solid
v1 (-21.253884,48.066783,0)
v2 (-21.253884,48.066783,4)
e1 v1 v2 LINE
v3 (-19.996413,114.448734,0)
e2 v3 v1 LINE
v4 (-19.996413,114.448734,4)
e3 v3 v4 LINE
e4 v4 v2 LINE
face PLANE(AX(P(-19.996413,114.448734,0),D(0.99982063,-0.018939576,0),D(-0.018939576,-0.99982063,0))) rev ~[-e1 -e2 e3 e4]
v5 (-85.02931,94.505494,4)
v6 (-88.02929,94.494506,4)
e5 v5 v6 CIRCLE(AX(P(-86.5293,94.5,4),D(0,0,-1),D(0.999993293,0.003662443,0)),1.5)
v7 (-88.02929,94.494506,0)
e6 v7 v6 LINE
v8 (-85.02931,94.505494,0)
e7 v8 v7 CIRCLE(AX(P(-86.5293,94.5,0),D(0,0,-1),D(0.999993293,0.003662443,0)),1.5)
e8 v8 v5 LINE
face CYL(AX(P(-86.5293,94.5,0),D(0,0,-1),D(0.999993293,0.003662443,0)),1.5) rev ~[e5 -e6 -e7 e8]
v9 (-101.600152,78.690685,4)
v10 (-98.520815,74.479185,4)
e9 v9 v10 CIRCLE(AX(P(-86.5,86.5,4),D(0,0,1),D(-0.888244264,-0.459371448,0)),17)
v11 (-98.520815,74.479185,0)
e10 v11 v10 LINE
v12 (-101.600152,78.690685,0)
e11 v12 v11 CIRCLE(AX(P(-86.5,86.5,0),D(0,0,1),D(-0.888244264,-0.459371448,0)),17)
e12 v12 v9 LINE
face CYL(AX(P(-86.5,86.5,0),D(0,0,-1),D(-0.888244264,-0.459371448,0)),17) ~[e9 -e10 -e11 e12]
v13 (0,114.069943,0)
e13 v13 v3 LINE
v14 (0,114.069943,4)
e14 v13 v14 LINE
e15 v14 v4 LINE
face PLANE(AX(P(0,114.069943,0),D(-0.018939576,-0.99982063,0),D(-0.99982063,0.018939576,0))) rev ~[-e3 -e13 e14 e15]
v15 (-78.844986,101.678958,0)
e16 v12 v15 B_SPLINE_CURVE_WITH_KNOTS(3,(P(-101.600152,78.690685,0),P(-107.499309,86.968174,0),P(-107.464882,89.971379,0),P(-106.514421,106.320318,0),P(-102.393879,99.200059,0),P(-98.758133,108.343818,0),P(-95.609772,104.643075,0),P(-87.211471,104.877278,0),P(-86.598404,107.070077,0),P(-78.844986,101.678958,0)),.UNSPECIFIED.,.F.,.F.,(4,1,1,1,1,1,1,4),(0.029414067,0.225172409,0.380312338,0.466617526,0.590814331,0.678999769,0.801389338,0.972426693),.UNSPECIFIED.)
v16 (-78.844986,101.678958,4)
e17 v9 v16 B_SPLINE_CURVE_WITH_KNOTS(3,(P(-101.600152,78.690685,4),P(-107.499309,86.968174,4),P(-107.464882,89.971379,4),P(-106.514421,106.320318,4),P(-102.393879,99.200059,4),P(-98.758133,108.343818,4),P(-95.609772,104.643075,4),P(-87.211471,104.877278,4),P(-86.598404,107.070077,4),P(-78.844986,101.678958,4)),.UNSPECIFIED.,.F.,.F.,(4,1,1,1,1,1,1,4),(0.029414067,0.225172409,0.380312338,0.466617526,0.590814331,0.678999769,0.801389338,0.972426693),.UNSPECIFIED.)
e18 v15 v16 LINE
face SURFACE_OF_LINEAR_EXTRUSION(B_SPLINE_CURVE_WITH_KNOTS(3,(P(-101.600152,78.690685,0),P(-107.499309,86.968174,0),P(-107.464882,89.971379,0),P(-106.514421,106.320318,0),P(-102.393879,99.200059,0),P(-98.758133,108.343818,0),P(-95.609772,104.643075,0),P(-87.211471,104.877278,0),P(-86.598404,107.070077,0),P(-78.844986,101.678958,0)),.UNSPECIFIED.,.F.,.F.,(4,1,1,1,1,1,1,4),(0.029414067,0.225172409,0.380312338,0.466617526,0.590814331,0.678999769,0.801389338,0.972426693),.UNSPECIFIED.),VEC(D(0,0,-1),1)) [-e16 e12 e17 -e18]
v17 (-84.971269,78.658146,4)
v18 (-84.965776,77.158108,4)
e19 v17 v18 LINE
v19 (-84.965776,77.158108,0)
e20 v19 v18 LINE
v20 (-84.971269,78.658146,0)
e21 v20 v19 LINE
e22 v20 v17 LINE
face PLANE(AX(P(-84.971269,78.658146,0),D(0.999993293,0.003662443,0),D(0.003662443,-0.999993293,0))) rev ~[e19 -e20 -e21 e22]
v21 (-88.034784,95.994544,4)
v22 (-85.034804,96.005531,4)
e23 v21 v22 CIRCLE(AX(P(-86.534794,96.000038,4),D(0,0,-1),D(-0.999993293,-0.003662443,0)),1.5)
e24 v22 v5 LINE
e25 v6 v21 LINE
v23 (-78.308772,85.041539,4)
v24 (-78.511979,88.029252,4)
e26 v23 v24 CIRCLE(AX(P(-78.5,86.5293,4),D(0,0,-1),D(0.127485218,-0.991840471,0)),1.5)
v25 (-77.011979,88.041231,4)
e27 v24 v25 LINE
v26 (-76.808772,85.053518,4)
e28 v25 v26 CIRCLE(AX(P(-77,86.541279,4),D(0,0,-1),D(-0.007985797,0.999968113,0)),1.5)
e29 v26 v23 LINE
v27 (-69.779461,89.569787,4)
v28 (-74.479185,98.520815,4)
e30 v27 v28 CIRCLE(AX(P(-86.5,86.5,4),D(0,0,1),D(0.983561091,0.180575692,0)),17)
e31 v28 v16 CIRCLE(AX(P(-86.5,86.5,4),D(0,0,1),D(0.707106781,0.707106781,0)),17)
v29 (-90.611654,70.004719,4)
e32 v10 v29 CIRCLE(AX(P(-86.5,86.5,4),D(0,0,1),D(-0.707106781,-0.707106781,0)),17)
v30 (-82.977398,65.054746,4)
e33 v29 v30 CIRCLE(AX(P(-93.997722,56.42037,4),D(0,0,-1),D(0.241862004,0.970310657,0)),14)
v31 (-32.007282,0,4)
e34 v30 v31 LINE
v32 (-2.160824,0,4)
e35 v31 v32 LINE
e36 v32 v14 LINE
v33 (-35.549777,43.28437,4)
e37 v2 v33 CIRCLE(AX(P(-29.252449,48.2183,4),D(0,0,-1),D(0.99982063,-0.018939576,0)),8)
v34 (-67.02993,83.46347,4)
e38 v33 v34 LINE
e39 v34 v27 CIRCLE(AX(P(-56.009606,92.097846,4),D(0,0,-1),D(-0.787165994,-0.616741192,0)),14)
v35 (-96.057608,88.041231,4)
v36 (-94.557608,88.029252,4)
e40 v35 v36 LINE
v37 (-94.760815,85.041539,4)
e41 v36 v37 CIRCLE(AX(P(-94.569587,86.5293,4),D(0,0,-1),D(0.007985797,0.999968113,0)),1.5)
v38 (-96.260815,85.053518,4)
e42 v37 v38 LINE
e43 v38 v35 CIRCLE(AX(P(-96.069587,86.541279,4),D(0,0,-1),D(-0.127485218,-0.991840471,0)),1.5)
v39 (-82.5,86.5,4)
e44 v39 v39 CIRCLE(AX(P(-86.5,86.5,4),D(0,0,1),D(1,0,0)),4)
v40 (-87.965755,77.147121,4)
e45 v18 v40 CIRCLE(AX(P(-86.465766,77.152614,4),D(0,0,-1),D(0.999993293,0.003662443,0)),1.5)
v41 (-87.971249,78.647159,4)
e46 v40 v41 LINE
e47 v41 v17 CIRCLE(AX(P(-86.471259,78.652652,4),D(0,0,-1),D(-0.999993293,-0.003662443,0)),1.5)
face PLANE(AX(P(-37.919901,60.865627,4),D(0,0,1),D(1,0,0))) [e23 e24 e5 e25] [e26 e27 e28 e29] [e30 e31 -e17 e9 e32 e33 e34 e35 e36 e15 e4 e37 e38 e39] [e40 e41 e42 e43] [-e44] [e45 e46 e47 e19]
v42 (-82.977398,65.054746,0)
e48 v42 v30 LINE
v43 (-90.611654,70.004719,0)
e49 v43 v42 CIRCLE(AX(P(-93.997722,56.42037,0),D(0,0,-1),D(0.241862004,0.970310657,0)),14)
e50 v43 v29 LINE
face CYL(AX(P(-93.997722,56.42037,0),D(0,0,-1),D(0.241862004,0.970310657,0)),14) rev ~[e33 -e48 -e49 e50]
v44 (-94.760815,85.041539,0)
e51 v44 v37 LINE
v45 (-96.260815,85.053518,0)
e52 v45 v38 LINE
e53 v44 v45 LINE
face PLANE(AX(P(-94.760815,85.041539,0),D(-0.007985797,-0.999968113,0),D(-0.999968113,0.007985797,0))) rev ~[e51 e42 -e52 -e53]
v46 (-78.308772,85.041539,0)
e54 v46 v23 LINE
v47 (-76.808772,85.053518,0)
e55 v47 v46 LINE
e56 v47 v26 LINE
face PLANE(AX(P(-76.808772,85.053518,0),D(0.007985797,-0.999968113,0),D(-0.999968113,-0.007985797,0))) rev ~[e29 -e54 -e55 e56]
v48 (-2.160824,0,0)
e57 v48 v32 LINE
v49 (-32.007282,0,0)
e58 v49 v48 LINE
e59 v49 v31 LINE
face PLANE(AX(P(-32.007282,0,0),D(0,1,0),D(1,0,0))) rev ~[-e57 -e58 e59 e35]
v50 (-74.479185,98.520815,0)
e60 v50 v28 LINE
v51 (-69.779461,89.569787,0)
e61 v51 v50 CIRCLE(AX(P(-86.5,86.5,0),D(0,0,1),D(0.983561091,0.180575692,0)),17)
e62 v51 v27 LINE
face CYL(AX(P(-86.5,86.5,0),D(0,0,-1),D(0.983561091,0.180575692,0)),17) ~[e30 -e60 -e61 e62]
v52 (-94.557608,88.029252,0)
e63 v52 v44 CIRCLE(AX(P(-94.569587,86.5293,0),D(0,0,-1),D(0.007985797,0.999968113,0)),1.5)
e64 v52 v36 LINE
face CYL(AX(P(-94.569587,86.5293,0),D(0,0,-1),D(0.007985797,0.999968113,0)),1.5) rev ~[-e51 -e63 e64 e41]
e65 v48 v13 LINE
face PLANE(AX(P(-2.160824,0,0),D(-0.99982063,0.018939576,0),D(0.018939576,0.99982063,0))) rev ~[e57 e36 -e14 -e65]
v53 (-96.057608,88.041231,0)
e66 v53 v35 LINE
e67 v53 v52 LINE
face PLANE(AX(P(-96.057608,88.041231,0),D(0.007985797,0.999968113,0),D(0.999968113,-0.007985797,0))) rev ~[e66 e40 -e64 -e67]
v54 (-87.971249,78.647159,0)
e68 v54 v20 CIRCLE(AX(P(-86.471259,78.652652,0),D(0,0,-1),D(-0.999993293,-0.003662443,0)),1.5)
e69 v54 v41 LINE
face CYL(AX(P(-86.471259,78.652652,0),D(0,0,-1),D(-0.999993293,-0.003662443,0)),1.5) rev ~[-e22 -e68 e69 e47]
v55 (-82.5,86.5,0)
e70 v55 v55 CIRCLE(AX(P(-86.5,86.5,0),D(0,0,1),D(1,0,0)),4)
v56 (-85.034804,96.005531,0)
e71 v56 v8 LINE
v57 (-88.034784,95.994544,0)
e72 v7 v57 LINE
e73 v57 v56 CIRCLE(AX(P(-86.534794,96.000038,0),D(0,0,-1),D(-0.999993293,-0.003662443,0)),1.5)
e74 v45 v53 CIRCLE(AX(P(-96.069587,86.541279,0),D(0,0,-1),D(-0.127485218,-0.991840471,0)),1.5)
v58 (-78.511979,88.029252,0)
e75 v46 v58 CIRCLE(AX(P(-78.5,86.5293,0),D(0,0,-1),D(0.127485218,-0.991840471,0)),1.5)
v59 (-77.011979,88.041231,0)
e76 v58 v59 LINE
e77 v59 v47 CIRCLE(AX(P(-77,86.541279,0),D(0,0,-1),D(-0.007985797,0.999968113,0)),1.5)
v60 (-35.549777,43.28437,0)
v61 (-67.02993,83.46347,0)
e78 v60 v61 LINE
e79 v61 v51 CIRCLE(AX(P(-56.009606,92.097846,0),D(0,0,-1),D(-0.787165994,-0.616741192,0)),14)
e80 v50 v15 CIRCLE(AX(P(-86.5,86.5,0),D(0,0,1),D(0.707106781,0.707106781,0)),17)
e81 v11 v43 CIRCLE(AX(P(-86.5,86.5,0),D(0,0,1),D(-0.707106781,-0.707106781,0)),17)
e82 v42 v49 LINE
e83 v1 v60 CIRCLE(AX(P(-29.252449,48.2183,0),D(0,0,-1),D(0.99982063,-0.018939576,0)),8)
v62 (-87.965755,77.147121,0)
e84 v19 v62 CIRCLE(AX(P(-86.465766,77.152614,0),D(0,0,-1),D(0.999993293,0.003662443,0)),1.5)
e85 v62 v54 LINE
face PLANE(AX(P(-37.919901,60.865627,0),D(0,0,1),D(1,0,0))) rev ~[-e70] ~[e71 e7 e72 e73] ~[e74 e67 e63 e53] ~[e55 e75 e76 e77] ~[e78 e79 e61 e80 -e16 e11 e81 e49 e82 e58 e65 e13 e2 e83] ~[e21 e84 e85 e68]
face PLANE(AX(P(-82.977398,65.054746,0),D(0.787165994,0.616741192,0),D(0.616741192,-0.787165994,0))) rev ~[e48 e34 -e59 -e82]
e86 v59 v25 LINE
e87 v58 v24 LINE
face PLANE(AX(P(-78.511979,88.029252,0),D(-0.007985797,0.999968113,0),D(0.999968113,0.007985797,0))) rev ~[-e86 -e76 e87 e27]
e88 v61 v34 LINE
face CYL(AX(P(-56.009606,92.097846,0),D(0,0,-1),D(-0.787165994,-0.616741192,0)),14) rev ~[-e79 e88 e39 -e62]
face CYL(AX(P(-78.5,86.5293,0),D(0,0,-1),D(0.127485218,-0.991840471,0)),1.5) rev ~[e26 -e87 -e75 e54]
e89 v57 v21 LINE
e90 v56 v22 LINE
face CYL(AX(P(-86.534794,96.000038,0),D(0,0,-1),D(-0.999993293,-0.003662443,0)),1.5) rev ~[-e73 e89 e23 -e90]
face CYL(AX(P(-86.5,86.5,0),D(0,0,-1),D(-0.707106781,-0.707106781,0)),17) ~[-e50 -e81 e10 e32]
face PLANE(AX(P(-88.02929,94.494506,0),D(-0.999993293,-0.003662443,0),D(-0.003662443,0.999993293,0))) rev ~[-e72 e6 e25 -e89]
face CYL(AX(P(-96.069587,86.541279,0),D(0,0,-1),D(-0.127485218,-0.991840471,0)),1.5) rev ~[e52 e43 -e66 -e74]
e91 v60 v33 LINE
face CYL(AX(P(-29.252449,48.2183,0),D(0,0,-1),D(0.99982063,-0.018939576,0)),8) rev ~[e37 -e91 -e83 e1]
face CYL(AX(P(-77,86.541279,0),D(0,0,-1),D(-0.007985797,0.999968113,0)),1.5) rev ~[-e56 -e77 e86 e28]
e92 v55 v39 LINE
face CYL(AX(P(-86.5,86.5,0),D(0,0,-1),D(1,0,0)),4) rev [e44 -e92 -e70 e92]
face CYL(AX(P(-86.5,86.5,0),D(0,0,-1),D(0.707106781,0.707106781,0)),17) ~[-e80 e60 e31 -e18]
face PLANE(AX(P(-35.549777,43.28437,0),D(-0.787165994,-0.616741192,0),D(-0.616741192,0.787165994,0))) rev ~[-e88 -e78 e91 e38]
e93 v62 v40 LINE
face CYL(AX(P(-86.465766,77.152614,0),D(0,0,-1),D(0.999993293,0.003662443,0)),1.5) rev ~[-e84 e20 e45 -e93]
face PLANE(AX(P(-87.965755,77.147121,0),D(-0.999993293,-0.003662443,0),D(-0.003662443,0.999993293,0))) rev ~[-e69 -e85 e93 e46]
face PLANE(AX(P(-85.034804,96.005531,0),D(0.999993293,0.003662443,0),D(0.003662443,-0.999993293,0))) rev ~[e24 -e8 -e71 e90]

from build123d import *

# Parameters (mm, degrees)
F0_R     = 4
F1_DEPTH = 4


with BuildPart() as f1:
    # F0 (on Top) → F1 (new body)
    with BuildSketch(Plane.XY):
        with BuildLine():
            Line((0, 114.0699429841), (-19.9964126031, 114.4487344947))
            Line((-19.9964126031, 114.4487344947), (-21.2538841411, 48.066782934))
            ThreePointArc((-21.2538841411, 48.066782934), (-26.7144538551, 40.6315624452), (-35.5497771317, 43.284369999))
            Line((-35.5497771317, 43.284369999), (-67.0299300919, 83.4634697431))
            ThreePointArc((-67.0299300919, 83.4634697431), (-68.7751857939, 86.3498052806), (-69.7794614538, 89.5697867556))
            ThreePointArc((-69.7794614538, 89.5697867556), (-71.4485355246, 94.4027474428), (-74.4791847198, 98.5208152801))
            add(Edge.make_bspline(
                [(-78.8449863391, 101.6789579961), (-77.5950408619, 100.8098438948), (-76.1528763386, 99.7673990725), (-74.4791847198, 98.5208152801)],
                knots=[0.9724266933, 0.9724266933, 0.9724266933, 0.9724266933, 1, 1, 1, 1], degree=3))
            ThreePointArc((-78.8449863391, 101.6789579961), (-98.5819159268, 98.459402474), (-101.6001524907, 78.6906853848))
            add(Edge.make_bspline(
                [(-98.5208152802, 74.4791847197), (-99.6937531098, 76.0541274909), (-100.7137627552, 77.4469344608), (-101.6001524907, 78.6906853848)],
                knots=[0, 0, 0, 0, 0.0294140674, 0.0294140674, 0.0294140674, 0.0294140674], degree=3))
            ThreePointArc((-98.5208152802, 74.4791847197), (-94.8707438763, 71.7036948206), (-90.6116540651, 70.0047188308))
            ThreePointArc((-90.6116540651, 70.0047188308), (-86.3811881753, 68.1672164729), (-82.9773982073, 65.0547463263))
            Line((-82.9773982073, 65.0547463263), (-32.007282446, 0))
            Line((-32.007282446, 0), (-2.1608238878, 0))
            Line((-2.1608238878, 0), (0, 114.0699429841))
        make_face()
        with BuildLine():
            Line((-87.9657554412, 77.1471207657), (-87.9712492813, 78.6471585373))
            ThreePointArc((-87.9712492813, 78.6471585373), (-86.4767530063, 80.152642142), (-84.9712694016, 78.658145867))
            Line((-84.9712694016, 78.658145867), (-84.9657755615, 77.1581080954))
            ThreePointArc((-84.9657755615, 77.1581080954), (-86.4602718365, 75.6526244907), (-87.9657554412, 77.1471207657))
        make_face(mode=Mode.SUBTRACT)
        with BuildLine():
            Line((-94.7608149911, 85.0415390363), (-96.2608149911, 85.053518114))
            ThreePointArc((-96.2608149911, 85.053518114), (-97.5661297199, 86.6430647749), (-96.057608469, 88.0412309896))
            Line((-96.057608469, 88.0412309896), (-94.557608469, 88.0292519119))
            ThreePointArc((-94.557608469, 88.0292519119), (-93.0730446096, 86.4275137875), (-94.7608149911, 85.0415390363))
        make_face(mode=Mode.SUBTRACT)
        with Locations((-86.5, 86.4999999999)):
            Circle(F0_R, mode=Mode.SUBTRACT)
        with BuildLine():
            ThreePointArc((-85.0293098025, 94.5054936649), (-86.5238060775, 93.0000100602), (-88.0292896822, 94.4945063352))
            Line((-88.0292896822, 94.4945063352), (-88.0347835222, 95.9945441067))
            ThreePointArc((-88.0347835222, 95.9945441067), (-86.5402872472, 97.5000277114), (-85.0348036425, 96.0055314364))
            Line((-85.0348036425, 96.0055314364), (-85.0293098025, 94.5054936649))
        make_face(mode=Mode.SUBTRACT)
        with BuildLine():
            ThreePointArc((-77.0119786958, 88.0412309896), (-75.5034574448, 86.6430647749), (-76.8087721736, 85.053518114))
            Line((-76.8087721736, 85.053518114), (-78.3087721736, 85.0415390363))
            ThreePointArc((-78.3087721736, 85.0415390363), (-79.9965425552, 86.4275137875), (-78.5119786958, 88.0292519119))
            Line((-78.5119786958, 88.0292519119), (-77.0119786958, 88.0412309896))
        make_face(mode=Mode.SUBTRACT)
        with BuildLine():
            add(Edge.make_bspline(
                [(-78.8449863391, 101.6789579961), (-77.5950408619, 100.8098438948), (-76.1528763386, 99.7673990725), (-74.4791847198, 98.5208152801)],
                knots=[0.9724266933, 0.9724266933, 0.9724266933, 0.9724266933, 1, 1, 1, 1], degree=3))
            ThreePointArc((-74.4791847198, 98.5208152801), (-76.5361640176, 100.2739599431), (-78.8449863391, 101.6789579961))
        make_face()
        with BuildLine():
            ThreePointArc((-101.6001524907, 78.6906853848), (-98.5819159268, 98.459402474), (-78.8449863391, 101.6789579961))
            add(Edge.make_bspline(
                [(-101.6001524907, 78.6906853848), (-107.499308914, 86.9681743468), (-107.4648818789, 89.9713790145), (-106.5144213519, 106.3203180581), (-102.3938787191, 99.2000591205), (-98.758133483, 108.3438184025), (-95.6097715331, 104.6430748676), (-87.2114705595, 104.8772775505), (-86.5984042079, 107.0700769895), (-78.8449863391, 101.6789579961)],
                knots=[0.0294140674, 0.0294140674, 0.0294140674, 0.0294140674, 0.2251724092, 0.3803123381, 0.4666175265, 0.5908143313, 0.6789997688, 0.8013893376, 0.9724266933, 0.9724266933, 0.9724266933, 0.9724266933], degree=3))
        make_face()
        with BuildLine():
            ThreePointArc((-101.6001524907, 78.6906853848), (-100.2230065099, 76.4661028343), (-98.5208152802, 74.4791847197))
            add(Edge.make_bspline(
                [(-98.5208152802, 74.4791847197), (-99.6937531098, 76.0541274909), (-100.7137627552, 77.4469344608), (-101.6001524907, 78.6906853848)],
                knots=[0, 0, 0, 0, 0.0294140674, 0.0294140674, 0.0294140674, 0.0294140674], degree=3))
        make_face()
    extrude(amount=F1_DEPTH)


solid = f1.part
